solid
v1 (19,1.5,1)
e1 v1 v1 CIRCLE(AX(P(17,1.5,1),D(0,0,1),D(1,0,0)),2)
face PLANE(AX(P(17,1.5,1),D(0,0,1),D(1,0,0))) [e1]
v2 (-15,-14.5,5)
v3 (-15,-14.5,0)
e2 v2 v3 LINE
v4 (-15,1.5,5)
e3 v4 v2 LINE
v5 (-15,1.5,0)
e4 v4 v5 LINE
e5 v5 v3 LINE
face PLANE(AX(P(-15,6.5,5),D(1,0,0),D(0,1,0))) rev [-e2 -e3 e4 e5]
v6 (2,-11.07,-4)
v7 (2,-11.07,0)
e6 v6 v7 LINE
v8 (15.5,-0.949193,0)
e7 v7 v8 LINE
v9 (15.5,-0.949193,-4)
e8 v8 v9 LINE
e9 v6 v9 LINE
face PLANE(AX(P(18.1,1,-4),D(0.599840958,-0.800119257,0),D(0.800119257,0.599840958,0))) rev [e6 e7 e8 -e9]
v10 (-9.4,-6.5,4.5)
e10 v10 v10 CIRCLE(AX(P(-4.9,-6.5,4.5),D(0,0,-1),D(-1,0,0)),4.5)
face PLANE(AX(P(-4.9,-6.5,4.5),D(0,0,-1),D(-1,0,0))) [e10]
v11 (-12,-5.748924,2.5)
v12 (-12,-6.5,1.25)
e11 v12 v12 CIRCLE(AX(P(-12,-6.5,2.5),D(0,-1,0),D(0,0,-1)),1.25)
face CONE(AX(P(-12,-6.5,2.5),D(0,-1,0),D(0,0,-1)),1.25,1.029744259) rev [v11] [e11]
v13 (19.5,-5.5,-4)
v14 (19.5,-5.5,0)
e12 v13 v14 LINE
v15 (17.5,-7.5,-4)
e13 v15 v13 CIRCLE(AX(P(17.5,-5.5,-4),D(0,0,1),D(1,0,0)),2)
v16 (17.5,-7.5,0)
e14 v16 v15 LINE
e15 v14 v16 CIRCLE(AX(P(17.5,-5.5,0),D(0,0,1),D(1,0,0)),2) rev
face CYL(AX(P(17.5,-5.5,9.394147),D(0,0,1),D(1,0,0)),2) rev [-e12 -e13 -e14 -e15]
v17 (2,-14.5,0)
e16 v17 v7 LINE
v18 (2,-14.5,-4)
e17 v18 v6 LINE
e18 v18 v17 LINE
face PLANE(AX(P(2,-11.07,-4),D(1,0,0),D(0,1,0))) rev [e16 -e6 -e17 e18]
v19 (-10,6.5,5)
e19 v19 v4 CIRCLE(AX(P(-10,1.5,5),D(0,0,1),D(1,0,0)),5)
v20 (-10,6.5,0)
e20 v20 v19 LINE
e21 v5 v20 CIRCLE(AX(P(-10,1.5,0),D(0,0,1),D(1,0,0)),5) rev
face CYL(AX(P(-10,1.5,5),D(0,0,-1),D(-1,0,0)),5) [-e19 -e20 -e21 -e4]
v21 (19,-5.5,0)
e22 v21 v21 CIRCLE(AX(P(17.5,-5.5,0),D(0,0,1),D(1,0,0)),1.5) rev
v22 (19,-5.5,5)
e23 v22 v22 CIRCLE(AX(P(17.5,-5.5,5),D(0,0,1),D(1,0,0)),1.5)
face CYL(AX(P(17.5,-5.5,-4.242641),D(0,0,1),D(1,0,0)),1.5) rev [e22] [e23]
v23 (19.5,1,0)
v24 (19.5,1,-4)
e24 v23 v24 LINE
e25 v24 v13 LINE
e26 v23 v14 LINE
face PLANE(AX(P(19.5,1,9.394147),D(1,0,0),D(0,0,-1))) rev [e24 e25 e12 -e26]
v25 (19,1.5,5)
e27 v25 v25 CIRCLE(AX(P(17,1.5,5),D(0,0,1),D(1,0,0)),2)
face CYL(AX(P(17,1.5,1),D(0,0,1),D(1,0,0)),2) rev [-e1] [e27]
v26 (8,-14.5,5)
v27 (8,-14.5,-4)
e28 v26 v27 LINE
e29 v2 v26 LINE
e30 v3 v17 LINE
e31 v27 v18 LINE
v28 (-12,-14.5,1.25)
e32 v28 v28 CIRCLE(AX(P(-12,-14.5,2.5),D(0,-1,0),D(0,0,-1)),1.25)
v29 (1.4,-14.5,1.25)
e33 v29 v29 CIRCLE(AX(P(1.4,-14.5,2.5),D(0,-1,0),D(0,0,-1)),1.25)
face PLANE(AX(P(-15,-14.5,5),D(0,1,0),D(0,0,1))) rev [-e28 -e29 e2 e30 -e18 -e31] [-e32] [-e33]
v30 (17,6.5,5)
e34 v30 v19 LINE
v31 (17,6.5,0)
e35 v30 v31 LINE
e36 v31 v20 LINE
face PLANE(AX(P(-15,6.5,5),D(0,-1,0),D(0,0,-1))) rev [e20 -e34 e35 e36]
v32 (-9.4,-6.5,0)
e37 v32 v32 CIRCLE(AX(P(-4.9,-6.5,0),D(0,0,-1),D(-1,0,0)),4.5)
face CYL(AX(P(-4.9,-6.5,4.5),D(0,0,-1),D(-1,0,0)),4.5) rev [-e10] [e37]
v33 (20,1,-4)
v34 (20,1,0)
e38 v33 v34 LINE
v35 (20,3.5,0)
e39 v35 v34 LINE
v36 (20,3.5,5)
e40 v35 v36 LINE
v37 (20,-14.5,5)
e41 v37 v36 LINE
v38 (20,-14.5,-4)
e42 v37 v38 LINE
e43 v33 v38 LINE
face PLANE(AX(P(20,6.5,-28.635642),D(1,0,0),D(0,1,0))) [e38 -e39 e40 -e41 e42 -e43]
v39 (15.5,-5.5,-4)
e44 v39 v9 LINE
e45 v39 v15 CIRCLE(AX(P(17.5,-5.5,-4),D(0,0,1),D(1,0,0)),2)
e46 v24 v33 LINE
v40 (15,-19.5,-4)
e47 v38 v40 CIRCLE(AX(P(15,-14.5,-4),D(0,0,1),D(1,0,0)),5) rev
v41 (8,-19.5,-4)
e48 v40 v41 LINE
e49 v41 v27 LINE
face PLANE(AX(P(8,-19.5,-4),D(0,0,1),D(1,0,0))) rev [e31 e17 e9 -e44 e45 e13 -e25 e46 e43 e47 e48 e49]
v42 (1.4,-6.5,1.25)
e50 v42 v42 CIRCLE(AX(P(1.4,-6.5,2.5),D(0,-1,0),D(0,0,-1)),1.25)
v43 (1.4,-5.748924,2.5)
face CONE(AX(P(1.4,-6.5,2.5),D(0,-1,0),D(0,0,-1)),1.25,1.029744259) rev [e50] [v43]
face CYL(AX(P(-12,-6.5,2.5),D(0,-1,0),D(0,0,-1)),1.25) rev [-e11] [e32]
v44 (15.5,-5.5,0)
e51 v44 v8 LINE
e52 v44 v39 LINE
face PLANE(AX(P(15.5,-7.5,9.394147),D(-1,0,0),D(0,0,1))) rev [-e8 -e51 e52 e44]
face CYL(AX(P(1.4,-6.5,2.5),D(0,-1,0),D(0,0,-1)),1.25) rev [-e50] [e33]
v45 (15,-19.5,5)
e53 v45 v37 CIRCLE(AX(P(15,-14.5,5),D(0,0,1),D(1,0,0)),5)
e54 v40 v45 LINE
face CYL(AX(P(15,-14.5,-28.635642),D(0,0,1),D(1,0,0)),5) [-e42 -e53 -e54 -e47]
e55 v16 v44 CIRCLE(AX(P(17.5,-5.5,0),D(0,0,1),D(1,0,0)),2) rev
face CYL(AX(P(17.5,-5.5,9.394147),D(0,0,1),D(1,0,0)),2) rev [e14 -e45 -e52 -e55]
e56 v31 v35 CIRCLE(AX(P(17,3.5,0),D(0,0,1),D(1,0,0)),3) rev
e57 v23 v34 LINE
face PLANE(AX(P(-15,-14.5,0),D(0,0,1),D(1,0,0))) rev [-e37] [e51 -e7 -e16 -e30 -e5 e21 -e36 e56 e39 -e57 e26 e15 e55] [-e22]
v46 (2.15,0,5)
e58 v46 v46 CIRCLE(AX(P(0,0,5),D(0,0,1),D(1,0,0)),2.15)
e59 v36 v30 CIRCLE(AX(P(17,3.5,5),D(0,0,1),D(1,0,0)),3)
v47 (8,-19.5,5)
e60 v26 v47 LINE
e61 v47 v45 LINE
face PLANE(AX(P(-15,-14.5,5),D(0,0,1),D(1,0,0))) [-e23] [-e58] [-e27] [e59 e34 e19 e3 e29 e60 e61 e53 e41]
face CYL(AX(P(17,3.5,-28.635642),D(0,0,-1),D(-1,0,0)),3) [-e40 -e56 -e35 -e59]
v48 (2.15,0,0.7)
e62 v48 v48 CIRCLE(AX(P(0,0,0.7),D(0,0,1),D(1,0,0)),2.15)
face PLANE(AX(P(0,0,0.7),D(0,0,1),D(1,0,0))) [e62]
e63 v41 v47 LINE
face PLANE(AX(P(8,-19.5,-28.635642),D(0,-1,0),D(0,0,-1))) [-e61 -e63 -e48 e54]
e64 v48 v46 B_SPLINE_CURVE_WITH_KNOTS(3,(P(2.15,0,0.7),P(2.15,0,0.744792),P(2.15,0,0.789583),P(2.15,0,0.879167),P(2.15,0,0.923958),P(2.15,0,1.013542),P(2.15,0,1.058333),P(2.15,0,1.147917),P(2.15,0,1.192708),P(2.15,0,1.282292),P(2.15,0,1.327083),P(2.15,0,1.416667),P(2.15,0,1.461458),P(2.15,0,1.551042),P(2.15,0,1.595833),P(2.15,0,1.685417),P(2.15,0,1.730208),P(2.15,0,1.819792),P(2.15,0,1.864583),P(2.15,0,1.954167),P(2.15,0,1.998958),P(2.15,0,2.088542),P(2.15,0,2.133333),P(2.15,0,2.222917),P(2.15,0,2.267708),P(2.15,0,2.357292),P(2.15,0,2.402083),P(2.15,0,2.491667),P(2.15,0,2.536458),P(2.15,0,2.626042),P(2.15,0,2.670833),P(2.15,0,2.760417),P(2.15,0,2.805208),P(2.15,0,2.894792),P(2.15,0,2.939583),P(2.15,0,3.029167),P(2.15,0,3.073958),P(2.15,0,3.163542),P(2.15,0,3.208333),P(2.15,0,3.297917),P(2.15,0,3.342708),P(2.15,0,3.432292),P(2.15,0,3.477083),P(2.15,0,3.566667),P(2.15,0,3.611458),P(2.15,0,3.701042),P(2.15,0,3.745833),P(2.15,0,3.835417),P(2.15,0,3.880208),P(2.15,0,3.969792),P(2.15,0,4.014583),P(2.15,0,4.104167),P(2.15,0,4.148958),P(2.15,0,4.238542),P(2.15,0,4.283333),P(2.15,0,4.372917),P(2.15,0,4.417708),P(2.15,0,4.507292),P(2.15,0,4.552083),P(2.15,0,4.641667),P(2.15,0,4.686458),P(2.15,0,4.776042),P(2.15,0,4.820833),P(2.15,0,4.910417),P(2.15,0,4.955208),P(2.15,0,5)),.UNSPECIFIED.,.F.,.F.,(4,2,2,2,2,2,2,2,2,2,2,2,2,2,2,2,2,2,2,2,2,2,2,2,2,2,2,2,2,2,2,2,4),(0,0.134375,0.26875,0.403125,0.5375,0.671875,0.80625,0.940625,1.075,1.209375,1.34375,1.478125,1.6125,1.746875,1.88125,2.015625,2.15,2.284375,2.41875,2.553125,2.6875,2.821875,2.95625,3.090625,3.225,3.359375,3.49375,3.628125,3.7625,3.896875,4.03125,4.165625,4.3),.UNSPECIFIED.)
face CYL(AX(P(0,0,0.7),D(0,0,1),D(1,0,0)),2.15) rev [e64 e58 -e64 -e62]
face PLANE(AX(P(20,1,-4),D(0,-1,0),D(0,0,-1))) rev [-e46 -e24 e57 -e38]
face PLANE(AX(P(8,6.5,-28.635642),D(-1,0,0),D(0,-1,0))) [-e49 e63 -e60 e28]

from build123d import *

# Parameters (mm, degrees)
SKETCH1_W             = 23
SKETCH1_H             = 21
EXTRUDE1_DEPTH        = 5
SKETCH2_R             = 2.15
EXTRUDE2_DEPTH        = 4.3
SKETCH3_R             = 4.5
EXTRUDE3_DEPTH        = 4.5
SKETCH4_R             = 1.25
EXTRUDE4_DEPTH        = 8
SKETCH7_W             = 12
SKETCH7_H             = 26
EXTRUDE6_DEPTH        = 5
SKETCH8_R             = 2
EXTRUDE7_DEPTH        = 4
SKETCH9_R             = 1.5
EXTRUDE8_DEPTH        = 5
FILLET2_R             = 3
M3_TAPPED_HOLE1_D     = 2.5
M3_TAPPED_HOLE1_DEPTH = 8
M3_TAPPED_HOLE1_TIP   = 0.751075774
EXTRUDE9_DEPTH        = 4
FILLET1_R             = 5
EXTRUDE10_DEPTH       = 4
FILLET3_R             = 2


with BuildPart() as part:
    # Sketch1 → Extrude1 (new body)
    with BuildSketch(Plane.XY):
        with Locations((-3.5, -4)):
            Rectangle(SKETCH1_W, SKETCH1_H)
    extrude(amount=EXTRUDE1_DEPTH)

    # Sketch2 → Extrude2 (cut)
    with BuildSketch(Plane.XY.offset(5)):
        Circle(SKETCH2_R)
    extrude(amount=-EXTRUDE2_DEPTH, mode=Mode.SUBTRACT)

    # Sketch3 → Extrude3 (cut)
    with BuildSketch(Plane(origin=(0, 0, 0), x_dir=(-1, 0, 0), z_dir=(0, 0, -1))):
        with Locations((4.9, -6.5)):
            Circle(SKETCH3_R)
    extrude(amount=-EXTRUDE3_DEPTH, mode=Mode.SUBTRACT)

    # Sketch4 → Extrude4 (cut)
    with BuildSketch(Plane.XZ.offset(14.5)):
        with Locations(Location((-12, 2.5, 0), (0, 0, 270))):
            Circle(SKETCH4_R)
        with Locations(Location((1.4, 2.5, 0), (0, 0, 270))):
            Circle(SKETCH4_R)
    extrude(amount=-EXTRUDE4_DEPTH, mode=Mode.SUBTRACT)

    # Sketch7 → Extrude6 (add)
    with BuildSketch(Plane.XY.offset(5)):
        with Locations((14, -6.5)):
            Rectangle(SKETCH7_W, SKETCH7_H)
    extrude(amount=-EXTRUDE6_DEPTH)

    # Sketch8 → Extrude7 (cut)
    with BuildSketch(Plane.XY.offset(5)):
        with Locations((17, 1.5)):
            Circle(SKETCH8_R)
    extrude(amount=-EXTRUDE7_DEPTH, mode=Mode.SUBTRACT)

    # Sketch9 → Extrude8 (cut)
    with BuildSketch(Plane.XY.offset(5)):
        with Locations((17.5, -5.5)):
            Circle(SKETCH9_R)
    extrude(amount=-EXTRUDE8_DEPTH, mode=Mode.SUBTRACT)

    # Fillet2
    fillet2_edges = [part.edges().sort_by_distance(p)[0] for p in [
        (20, 6.5, 2.5),
        (20, -19.5, 2.5),
    ]]
    fillet(fillet2_edges, radius=FILLET2_R)

    # M3 Tapped Hole1
    with Locations(Plane(origin=(-12, -14.5, 2.5), x_dir=(0, 0, -1), z_dir=(0, -1, 0))):
        with Locations((0, 0), (0, 13.4)):
            Hole(M3_TAPPED_HOLE1_D / 2, depth=M3_TAPPED_HOLE1_DEPTH)
            with Locations((0, 0, -(M3_TAPPED_HOLE1_DEPTH + M3_TAPPED_HOLE1_TIP / 2))):  # 118° drill point
                Cone(0, M3_TAPPED_HOLE1_D / 2, M3_TAPPED_HOLE1_TIP, mode=Mode.SUBTRACT)

    # Sketch11 → Extrude9 (add)
    with BuildSketch(Plane(origin=(0, 0, 0), x_dir=(-1, 0, 0), z_dir=(0, 0, -1))):
        Polygon((-8, -19.5), (-20, -19.5), (-20, 1), (-18.1, 1), (-2, -11.07), (-2, -14.5), (-8, -14.5), align=None)
    extrude(amount=EXTRUDE9_DEPTH)

    # Fillet1
    fillet1_edges = [part.edges().sort_by_distance(p)[0] for p in [
        (-15, 6.5, 2.5),
        (20, -19.5, -2),
    ]]
    fillet(fillet1_edges, radius=FILLET1_R)

    # Sketch12 → Extrude10 (cut)
    with BuildSketch(Plane(origin=(0, 0, -4), x_dir=(-1, 0, 0), z_dir=(0, 0, -1))):
        Polygon((-19.5, 1), (-19.5, -7.5), (-15.5, -7.5), (-15.5, -0.949192547), (-18.1, 1), align=None)
    extrude(amount=-EXTRUDE10_DEPTH, mode=Mode.SUBTRACT)

    # Fillet3
    fillet3_edges = [part.edges().sort_by_distance(p)[0] for p in [
        (15.5, -7.5, -2),
        (19.5, -7.5, -2),
    ]]
    fillet(fillet3_edges, radius=FILLET3_R - 0.0001)  # a hair under: the kernel refuses the full size


solid = part.part
